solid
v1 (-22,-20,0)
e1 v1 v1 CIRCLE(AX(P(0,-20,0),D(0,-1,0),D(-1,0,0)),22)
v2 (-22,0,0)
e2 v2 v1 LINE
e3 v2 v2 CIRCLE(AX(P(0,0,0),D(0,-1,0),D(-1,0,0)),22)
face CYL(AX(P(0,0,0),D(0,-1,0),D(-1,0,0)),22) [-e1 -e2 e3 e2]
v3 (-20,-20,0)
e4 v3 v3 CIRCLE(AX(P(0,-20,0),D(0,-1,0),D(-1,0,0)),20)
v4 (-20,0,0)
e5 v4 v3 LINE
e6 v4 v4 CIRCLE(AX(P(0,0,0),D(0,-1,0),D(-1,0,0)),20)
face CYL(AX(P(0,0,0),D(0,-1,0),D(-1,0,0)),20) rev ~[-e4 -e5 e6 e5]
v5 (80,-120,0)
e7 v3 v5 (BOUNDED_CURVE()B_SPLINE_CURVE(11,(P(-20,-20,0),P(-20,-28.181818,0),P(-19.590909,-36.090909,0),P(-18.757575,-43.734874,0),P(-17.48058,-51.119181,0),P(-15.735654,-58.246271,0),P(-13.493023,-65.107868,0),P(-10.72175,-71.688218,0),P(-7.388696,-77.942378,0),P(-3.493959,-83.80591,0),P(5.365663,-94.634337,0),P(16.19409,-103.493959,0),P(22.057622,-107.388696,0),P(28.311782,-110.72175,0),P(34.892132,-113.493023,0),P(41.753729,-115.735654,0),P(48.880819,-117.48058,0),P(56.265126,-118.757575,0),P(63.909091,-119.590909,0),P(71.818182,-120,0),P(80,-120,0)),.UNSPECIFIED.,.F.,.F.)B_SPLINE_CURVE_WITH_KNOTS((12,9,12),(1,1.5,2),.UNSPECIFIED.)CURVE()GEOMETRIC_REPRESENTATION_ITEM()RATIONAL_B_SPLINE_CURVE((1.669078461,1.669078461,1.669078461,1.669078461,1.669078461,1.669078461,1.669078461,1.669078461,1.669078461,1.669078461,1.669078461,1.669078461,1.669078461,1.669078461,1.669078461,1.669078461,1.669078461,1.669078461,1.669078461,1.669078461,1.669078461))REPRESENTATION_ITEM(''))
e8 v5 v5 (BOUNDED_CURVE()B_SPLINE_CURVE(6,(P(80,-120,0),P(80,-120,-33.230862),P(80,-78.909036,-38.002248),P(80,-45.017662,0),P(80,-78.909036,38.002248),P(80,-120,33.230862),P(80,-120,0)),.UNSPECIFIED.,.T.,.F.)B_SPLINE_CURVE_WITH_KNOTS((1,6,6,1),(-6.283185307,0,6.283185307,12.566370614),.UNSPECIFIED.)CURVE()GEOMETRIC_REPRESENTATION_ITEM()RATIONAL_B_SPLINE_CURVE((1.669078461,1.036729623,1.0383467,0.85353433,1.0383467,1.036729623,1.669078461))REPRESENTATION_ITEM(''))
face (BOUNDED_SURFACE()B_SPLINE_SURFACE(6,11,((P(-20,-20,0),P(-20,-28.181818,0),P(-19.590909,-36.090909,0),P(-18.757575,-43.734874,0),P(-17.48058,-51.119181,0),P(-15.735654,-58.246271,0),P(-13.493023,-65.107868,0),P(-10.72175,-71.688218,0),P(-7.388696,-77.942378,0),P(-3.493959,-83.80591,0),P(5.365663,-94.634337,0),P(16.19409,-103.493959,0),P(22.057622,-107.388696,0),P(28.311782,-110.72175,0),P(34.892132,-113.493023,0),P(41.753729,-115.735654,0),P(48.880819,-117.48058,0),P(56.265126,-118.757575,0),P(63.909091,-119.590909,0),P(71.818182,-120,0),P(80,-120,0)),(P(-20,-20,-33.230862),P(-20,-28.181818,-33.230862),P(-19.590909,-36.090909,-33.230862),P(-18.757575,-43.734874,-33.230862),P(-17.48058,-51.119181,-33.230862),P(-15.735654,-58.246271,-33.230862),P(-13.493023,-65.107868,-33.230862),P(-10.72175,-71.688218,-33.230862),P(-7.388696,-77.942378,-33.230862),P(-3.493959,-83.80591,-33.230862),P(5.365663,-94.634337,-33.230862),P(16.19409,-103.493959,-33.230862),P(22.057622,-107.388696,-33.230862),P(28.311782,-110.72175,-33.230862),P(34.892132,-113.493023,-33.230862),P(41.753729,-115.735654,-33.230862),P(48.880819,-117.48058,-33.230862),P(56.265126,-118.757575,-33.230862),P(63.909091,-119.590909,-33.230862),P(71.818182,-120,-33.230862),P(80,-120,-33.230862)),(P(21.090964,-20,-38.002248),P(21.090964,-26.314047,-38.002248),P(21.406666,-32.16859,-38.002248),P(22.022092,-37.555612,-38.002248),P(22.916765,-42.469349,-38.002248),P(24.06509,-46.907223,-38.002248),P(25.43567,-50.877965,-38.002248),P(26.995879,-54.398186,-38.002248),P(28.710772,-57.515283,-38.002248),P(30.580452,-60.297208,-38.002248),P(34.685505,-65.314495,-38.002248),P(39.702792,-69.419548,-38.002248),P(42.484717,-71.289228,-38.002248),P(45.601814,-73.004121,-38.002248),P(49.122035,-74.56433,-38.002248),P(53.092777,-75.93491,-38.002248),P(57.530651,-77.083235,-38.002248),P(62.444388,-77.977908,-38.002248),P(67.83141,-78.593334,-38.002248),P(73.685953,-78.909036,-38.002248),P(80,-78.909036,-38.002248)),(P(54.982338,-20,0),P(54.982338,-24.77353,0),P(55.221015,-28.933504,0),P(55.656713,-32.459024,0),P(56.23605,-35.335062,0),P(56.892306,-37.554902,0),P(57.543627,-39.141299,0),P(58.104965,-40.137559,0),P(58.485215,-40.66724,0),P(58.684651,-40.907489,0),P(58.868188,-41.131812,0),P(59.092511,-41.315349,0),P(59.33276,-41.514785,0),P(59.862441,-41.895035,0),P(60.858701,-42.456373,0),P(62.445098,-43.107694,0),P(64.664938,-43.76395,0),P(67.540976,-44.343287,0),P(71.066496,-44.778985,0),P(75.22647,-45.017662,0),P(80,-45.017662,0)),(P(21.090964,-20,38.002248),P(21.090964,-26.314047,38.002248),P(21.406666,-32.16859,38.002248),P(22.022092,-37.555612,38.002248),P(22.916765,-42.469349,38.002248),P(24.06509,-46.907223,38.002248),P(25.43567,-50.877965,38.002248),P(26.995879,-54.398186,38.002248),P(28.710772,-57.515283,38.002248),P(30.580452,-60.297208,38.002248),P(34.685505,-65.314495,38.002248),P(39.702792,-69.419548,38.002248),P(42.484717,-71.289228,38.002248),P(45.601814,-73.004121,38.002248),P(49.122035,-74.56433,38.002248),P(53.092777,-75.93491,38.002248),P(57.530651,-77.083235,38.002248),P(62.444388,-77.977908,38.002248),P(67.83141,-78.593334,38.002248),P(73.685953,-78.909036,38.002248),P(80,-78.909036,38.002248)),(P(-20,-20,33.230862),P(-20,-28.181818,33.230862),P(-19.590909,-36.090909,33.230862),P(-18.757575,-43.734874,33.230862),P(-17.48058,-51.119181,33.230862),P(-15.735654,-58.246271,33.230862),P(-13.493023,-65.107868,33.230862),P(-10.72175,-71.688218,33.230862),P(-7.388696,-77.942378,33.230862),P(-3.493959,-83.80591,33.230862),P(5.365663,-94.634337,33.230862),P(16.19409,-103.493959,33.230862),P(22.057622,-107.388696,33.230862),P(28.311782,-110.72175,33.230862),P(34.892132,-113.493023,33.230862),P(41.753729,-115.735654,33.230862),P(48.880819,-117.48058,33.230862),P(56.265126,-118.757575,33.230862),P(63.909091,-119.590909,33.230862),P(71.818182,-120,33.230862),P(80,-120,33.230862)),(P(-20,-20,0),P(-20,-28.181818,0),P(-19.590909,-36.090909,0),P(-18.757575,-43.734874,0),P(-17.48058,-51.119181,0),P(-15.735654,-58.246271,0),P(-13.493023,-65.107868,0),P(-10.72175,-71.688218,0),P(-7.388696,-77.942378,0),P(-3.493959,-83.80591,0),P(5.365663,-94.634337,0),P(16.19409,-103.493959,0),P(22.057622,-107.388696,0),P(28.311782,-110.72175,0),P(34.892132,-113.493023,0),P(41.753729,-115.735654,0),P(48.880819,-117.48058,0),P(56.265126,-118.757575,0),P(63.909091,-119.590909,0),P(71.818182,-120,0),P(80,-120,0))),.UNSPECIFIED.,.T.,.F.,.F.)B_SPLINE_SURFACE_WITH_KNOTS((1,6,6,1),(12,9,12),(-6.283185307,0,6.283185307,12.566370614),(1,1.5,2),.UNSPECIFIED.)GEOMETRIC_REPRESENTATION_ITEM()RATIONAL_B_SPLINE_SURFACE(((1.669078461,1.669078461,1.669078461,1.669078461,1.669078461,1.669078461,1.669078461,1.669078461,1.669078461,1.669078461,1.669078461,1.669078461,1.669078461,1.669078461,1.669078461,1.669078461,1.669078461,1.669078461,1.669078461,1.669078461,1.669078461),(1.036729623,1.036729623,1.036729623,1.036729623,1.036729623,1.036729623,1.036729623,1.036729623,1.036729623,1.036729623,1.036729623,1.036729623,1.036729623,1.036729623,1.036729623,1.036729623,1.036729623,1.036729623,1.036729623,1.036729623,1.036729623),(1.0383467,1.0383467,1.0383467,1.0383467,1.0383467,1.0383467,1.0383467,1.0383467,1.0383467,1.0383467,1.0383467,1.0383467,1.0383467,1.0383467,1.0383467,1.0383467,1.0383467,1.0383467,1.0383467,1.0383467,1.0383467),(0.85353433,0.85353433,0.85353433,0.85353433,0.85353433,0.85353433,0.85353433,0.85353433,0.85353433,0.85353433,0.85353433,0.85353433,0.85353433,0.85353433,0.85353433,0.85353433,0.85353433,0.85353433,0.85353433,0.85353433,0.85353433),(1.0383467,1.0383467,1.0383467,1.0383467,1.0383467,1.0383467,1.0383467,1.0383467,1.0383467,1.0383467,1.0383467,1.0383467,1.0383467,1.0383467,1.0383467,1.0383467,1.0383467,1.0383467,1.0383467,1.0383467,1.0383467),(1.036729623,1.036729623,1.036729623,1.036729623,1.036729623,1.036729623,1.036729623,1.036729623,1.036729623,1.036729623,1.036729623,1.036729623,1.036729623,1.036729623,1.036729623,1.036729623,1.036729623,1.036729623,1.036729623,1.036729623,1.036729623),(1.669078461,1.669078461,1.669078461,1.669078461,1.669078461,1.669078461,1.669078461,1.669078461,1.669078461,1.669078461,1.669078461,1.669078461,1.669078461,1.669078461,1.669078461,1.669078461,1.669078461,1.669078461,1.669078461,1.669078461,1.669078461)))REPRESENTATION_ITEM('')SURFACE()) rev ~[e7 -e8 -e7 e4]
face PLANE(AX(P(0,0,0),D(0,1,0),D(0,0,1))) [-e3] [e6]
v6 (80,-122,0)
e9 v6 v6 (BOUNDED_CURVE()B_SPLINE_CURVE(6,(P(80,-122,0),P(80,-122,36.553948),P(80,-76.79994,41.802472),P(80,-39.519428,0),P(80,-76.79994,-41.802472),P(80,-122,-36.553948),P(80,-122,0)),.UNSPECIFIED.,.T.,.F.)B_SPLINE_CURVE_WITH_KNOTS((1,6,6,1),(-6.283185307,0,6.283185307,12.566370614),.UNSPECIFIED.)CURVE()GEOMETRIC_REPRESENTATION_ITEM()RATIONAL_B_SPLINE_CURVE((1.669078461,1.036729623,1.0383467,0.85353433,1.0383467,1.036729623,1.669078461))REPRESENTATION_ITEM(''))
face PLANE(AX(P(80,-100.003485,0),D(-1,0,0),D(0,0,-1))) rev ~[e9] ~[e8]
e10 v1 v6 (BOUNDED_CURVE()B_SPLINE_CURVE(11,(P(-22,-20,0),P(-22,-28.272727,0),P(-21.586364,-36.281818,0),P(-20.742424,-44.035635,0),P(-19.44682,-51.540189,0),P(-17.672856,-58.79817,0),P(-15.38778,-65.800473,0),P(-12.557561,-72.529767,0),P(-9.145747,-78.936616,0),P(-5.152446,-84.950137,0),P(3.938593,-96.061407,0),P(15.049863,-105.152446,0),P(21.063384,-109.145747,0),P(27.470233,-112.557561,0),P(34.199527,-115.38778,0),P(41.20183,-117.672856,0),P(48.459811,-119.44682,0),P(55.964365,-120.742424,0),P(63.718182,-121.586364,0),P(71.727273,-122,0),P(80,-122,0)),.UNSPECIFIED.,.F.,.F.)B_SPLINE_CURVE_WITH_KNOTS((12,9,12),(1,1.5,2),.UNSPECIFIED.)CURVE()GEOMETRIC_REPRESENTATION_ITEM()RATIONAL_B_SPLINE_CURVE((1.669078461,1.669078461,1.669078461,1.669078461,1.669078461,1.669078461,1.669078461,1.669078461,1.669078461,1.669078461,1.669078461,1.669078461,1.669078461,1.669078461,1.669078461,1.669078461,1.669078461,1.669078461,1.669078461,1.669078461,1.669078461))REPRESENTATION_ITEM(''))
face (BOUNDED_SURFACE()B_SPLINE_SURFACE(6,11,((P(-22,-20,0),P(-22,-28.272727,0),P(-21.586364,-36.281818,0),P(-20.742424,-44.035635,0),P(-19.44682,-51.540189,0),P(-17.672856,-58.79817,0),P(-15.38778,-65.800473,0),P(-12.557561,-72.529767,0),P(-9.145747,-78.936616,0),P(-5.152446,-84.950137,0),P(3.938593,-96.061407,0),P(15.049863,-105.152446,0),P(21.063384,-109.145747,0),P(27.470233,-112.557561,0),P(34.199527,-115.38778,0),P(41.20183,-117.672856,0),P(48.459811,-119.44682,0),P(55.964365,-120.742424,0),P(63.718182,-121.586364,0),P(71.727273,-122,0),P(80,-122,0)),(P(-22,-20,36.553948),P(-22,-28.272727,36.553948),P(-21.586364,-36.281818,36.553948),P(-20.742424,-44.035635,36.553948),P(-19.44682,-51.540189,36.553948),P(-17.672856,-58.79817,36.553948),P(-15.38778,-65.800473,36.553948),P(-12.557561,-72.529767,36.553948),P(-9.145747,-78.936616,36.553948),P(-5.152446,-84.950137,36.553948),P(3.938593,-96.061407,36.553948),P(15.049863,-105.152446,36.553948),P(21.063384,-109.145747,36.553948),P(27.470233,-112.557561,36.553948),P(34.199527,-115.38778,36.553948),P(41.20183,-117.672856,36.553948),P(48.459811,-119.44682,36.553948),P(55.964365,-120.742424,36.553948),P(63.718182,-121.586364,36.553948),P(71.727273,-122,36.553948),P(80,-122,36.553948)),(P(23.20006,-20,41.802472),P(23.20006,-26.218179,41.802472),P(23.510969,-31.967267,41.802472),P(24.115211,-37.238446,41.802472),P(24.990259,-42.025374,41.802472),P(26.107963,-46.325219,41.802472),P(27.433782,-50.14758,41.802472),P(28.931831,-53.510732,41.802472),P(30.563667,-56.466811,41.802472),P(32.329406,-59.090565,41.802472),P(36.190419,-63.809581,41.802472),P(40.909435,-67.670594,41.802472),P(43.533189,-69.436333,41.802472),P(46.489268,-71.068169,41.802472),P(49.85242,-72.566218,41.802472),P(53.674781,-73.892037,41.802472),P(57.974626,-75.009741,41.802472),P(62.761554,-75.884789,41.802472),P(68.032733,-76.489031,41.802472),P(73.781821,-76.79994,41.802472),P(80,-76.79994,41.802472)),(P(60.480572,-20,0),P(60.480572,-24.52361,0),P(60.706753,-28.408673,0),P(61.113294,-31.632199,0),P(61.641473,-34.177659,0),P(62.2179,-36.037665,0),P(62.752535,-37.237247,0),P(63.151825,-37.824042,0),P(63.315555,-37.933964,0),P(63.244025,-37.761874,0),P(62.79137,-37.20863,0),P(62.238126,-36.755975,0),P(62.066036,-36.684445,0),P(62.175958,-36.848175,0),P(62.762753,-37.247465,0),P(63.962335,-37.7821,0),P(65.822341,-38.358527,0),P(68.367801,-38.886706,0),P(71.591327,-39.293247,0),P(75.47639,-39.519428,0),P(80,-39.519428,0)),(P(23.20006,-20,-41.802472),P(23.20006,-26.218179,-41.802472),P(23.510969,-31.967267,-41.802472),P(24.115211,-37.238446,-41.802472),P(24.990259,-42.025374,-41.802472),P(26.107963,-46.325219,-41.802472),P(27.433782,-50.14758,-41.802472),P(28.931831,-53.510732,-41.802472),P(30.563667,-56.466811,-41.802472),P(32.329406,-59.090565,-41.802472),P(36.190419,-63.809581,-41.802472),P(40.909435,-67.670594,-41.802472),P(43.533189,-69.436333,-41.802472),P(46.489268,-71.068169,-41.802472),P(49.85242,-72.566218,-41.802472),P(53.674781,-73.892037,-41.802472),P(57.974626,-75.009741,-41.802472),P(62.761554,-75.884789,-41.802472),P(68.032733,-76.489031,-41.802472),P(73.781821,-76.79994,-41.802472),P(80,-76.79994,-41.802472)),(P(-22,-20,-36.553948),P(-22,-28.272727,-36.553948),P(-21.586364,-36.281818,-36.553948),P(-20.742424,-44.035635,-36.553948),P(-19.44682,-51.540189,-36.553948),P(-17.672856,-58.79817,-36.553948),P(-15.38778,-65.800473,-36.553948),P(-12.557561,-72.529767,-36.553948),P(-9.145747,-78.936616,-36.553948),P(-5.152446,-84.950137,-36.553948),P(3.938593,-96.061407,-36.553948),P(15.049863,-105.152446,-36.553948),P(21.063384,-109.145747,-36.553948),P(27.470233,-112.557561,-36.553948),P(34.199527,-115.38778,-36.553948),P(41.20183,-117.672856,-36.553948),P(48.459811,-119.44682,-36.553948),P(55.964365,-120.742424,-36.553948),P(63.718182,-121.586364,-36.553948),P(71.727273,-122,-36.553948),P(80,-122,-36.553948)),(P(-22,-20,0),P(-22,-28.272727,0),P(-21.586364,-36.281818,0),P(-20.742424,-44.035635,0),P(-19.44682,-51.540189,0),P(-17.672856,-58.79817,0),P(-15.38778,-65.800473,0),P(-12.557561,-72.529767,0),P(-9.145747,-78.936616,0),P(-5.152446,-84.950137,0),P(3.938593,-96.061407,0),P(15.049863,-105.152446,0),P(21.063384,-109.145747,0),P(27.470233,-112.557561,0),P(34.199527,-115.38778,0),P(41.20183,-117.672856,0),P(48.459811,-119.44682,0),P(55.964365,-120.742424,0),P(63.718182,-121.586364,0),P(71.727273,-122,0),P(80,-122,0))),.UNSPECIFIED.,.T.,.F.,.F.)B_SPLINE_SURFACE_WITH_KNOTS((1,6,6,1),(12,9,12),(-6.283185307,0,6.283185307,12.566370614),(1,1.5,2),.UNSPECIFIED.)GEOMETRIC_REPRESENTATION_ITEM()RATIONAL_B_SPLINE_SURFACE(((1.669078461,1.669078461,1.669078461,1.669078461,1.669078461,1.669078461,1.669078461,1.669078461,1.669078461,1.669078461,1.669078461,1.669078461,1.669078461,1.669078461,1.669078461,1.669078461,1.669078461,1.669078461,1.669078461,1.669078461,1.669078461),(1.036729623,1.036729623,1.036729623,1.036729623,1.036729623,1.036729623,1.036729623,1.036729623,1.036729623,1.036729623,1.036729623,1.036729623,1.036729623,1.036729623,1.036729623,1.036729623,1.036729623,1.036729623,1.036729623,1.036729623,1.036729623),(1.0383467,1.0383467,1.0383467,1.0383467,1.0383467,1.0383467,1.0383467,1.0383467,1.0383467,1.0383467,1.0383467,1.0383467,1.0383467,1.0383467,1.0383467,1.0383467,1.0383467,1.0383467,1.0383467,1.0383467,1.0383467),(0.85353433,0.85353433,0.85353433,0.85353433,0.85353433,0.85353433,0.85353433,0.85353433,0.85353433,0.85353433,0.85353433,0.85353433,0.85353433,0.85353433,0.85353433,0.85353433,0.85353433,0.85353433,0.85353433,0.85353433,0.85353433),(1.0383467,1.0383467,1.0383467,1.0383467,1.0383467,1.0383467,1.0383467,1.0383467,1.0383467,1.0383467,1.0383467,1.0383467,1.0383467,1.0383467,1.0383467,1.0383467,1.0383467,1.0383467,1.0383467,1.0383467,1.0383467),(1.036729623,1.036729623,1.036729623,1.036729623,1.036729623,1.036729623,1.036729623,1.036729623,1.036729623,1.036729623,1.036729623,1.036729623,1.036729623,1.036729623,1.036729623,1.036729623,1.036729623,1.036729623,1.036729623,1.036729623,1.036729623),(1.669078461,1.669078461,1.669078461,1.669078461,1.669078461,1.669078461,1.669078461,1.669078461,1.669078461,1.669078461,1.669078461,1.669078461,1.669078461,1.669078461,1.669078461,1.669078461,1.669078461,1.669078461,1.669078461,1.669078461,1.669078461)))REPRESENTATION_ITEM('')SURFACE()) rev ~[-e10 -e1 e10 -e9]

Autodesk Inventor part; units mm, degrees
ref_plane "YZ Plane" through (0, 0, 0) normal (1, 0, 0) x (0, 1, 0)
ref_plane "XZ Plane" through (0, 0, 0) normal (0, 1, 0) x (-1, 0, 0)
ref_plane "XY Plane" through (0, 0, 0) normal (0, 0, 1) x (1, 0, 0)
sketch "Sketch1" plane through (0, 0, 0) normal (0, 1, 0) x (-1, 0, 0)
  circle A0 centre (0, 0) radius 20
  circle A1 centre (0, 0) radius 22
  dimension "d0" = 40
  dimension "d1" = 2
sketch3d "3D Sketch4"
  line L0 (0, 0, 0) -> (0, -20, 0)
  spline S0 degree 2 poles (0, -20, 0) (0, -100, 0) (80, -100, 0) knots 1 1 1 2 2 2
  dimension "d4" = 20
  dimension "d5" = 80
  dimension "d6" = 80
sweep "Sweep1" add profiles "Sketch1" path "3D Sketch4"
properties part number "Pipe"
